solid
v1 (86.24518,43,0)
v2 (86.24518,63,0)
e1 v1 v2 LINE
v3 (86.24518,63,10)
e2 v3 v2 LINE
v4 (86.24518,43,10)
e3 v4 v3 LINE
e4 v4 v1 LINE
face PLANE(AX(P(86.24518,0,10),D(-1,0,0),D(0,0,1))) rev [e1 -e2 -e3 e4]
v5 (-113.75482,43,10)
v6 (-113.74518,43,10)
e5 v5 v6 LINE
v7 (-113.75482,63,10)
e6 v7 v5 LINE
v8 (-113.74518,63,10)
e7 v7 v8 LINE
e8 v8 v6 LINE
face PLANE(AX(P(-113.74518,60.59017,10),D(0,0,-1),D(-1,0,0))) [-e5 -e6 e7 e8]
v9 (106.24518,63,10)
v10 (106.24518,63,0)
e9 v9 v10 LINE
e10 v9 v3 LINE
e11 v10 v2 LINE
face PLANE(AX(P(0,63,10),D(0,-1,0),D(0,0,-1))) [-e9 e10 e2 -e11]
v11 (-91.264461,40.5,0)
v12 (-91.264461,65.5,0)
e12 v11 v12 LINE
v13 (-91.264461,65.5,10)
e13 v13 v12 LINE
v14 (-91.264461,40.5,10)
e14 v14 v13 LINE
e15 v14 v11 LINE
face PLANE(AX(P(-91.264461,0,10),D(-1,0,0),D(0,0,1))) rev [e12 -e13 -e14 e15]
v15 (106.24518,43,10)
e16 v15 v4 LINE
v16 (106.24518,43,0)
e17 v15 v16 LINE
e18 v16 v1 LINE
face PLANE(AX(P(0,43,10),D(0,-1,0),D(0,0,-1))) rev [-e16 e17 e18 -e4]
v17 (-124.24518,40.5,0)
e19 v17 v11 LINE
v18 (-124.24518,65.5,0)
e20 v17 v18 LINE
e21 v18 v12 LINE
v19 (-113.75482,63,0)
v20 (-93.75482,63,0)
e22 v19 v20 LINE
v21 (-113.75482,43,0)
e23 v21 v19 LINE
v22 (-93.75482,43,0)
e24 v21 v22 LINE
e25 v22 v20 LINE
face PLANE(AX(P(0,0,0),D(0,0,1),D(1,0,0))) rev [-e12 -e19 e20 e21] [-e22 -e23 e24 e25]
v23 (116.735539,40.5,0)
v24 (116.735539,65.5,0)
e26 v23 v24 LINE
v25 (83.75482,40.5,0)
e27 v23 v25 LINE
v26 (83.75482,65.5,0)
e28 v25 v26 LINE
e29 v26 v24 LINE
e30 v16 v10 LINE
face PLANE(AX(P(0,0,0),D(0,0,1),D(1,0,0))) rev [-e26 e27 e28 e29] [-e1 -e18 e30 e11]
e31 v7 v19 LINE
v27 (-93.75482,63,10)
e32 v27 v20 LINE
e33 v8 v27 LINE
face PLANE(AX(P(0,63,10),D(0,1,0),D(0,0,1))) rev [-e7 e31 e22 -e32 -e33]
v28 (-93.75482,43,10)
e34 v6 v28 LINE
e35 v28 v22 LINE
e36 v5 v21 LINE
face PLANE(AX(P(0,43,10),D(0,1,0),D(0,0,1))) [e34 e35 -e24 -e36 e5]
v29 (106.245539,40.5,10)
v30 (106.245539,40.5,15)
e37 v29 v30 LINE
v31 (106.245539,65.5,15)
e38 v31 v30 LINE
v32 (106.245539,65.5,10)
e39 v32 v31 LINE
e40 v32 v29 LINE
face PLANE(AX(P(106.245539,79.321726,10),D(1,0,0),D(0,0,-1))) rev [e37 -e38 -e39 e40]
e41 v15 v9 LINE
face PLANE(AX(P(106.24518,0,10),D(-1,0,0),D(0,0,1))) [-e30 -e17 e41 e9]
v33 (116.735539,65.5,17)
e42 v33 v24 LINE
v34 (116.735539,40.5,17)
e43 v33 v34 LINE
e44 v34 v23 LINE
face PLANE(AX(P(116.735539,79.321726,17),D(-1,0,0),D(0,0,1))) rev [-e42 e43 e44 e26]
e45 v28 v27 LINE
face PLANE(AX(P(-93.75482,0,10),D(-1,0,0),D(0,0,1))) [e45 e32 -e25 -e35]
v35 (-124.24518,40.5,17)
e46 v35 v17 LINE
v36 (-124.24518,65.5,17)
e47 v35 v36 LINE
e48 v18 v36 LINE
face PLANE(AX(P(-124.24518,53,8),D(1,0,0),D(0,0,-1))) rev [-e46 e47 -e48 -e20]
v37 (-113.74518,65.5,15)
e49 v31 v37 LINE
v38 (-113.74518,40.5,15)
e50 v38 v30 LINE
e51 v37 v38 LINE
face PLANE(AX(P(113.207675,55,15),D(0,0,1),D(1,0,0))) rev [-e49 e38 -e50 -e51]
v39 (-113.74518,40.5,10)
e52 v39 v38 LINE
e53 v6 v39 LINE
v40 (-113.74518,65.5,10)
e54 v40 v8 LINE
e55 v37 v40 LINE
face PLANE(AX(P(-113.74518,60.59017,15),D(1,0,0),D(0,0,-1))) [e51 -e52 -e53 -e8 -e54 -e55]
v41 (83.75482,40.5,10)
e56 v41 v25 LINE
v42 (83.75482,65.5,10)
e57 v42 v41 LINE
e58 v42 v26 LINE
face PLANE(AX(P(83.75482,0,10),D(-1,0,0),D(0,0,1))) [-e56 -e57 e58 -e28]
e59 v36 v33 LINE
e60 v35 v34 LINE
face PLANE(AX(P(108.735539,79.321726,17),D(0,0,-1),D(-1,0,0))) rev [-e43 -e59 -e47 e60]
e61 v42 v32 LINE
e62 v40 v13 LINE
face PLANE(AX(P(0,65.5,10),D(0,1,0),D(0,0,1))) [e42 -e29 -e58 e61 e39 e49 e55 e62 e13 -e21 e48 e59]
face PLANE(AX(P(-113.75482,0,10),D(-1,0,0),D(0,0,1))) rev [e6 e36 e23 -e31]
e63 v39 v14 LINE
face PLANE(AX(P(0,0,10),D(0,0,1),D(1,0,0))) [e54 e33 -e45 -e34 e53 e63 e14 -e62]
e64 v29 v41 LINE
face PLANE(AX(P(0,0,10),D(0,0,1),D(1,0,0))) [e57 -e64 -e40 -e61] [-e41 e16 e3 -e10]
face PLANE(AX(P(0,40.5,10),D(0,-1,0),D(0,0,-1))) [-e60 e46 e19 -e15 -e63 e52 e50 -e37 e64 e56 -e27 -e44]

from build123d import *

# Parameters (mm, degrees)
ESQUISSE1_W                     = 20
ESQUISSE1_H                     = 20
BOSS_EXTRU_1_DEPTH              = 10
ESQUISSE2_W                     = 237.218260139
ESQUISSE2_H                     = 128.428413156
ENL_V_MAT_EXTRU_6_DEPTH         = 10
ENL_V_MAT_EXTRU_7_DEPTH         = 10
BOSS_EXTRU_4_START              = -2
BOSS_EXTRU_4_DEPTH              = 9
ESQUISSE10_W                    = 2
ESQUISSE10_H                    = 4
BOSS_EXTRU_5_DEPTH              = 224.980719072
ESQUISSE11_W                    = 2.5
ESQUISSE11_H                    = 5
BOSS_EXTRU_6_DEPTH              = 4
SYM_TRIE1_START                 = 8
SYM_TRIE1_OUTLINE_W             = 4
SYM_TRIE1_OUTLINE_H             = 4
SYM_TRIE1_DEPTH                 = 9
BOSS_EXTRU_9_REACH              = 128.238
BOSS_EXTRU_9_DIRECTION_2_REACH  = 128.238
BOSS_EXTRU_10_REACH             = 128.238
BOSS_EXTRU_10_DIRECTION_2_REACH = 128.238
ESQUISSE14_W                    = 8
ESQUISSE14_H                    = 8
BOSS_EXTRU_11_DEPTH             = 25


# Read off the part's stored shape, not the designer's step: Symétrie1
with BuildPart() as part:
    # Esquisse1 → Boss.-Extru.1 (new body)
    with BuildSketch(Plane.XY):
        Polygon((-116.245179768, 65.5), (-116.245179768, 40.5), (-116.189357624, -40.5), (-116.189357624, -65.5), (108.67971716, -65.5), (108.67971716, -40.5), (108.735539304, 40.5), (108.735539304, 65.5), align=None)
        Polygon((83.754820232, 40.5), (106.172004788, 40.5), (106.172004788, -40.5), (83.67971716, -40.5), (83.67971716, -63), (-91.189357624, -63), (-91.189357624, -40.5), (-113.681645253, -40.5), (-113.681645253, 40.5), (-91.264460696, 40.5), (-91.264460696, 63), (83.754820232, 63), align=None, mode=Mode.SUBTRACT)
        Polygon((-113.66622051, -63.007706414), (-113.681645253, -43.007712371), (-93.681645253, -43.023131157), (-93.697069995, -62.992287629), align=None, mode=Mode.SUBTRACT)
        Polygon((106.172004788, -43.007712371), (106.156580046, -63.007706414), (86.187429531, -62.992287629), (86.172004788, -43.023131157), align=None, mode=Mode.SUBTRACT)
        with Locations((-103.754820232, 53)):
            Rectangle(ESQUISSE1_W, ESQUISSE1_H, mode=Mode.SUBTRACT)
        with Locations((96.245179768, 53)):
            Rectangle(ESQUISSE1_W, ESQUISSE1_H, mode=Mode.SUBTRACT)
    extrude(amount=BOSS_EXTRU_1_DEPTH)

    # Esquisse2 → Enlèv. mat.-Extru.6 (cut)
    with BuildSketch(Plane(origin=(0, 0, 0), x_dir=(-1, 0, 0), z_dir=(0, 0, -1))):
        with Locations((9.873590765, -23.714206578)):
            Rectangle(ESQUISSE2_W, ESQUISSE2_H)
    extrude(amount=-ENL_V_MAT_EXTRU_6_DEPTH, mode=Mode.SUBTRACT)

    # Esquisse4 → Enlèv. mat.-Extru.7 (cut)
    with BuildSketch(Plane(origin=(0, 0, 0), x_dir=(-1, 0, 0), z_dir=(0, 0, -1))):
        Polygon((-83.754820232, 63), (-83.754820232, 68.626436571), (91.264460696, 65.5), (91.264460696, 63), align=None)
    extrude(amount=-ENL_V_MAT_EXTRU_7_DEPTH, mode=Mode.SUBTRACT)


with BuildPart() as enl_v_mat_extru_7_piece_1:
    # of the separate pieces the step leaves, piece 1, a body of its own (enl_v_mat_extru_7_pieces)
    add(part.part.solids().sort_by_distance((-116.245179768, 65.5, 0))[0])

    # Esquisse9 → Boss.-Extru.4 (add)
    with BuildSketch(Plane.XY.offset(10).offset(BOSS_EXTRU_4_START)):
        Polygon((-116.245179768, 53), (-116.245179768, 55), (-120.245179768, 55), (-120.245179768, 51), (-116.245179768, 51), align=None)
    extrude(amount=BOSS_EXTRU_4_DEPTH)

    # Esquisse10 → Boss.-Extru.5 (add)
    with BuildSketch(Plane(origin=(-116.245179768, 0, 0), x_dir=(0, 0, -1), z_dir=(1, 0, 0))):
        with Locations((-16, 53)):
            Rectangle(ESQUISSE10_W, ESQUISSE10_H)
    extrude(amount=BOSS_EXTRU_5_DEPTH)

    # Esquisse11 → Boss.-Extru.6 (add)
    with BuildSketch(Plane.XZ.offset(-51)):
        with Locations((-114.995179768, 12.5)):
            Rectangle(ESQUISSE11_W, ESQUISSE11_H)
    extrude(amount=-BOSS_EXTRU_6_DEPTH)

    # Symétrie1 outline → Symétrie1 (add)
    with BuildSketch(Plane.XY.offset(SYM_TRIE1_START)):
        with Locations((-122.245179768, 53)):
            Rectangle(SYM_TRIE1_OUTLINE_W, SYM_TRIE1_OUTLINE_H)
    extrude(amount=SYM_TRIE1_DEPTH)


with BuildPart() as enl_v_mat_extru_7_piece_2:
    # of the separate pieces the step leaves, piece 2, a body of its own (enl_v_mat_extru_7_pieces)
    add(part.part.solids().sort_by_distance((108.735539304, 65.5, 0))[0])

    # Boss.-Extru.9: up to this face of the body (flat: up to its plane)
    boss_extru_9_end = Plane(enl_v_mat_extru_7_piece_2.part.faces().sort_by_distance((96.245179768, 65.5, 5))[0])
    # Esquisse12 → Boss.-Extru.9 (add, up to the picked face)
    with BuildSketch(Plane(origin=(0, 55, 0), x_dir=(1, 0, 0), z_dir=(0, 1, 0)), mode=Mode.PRIVATE) as boss_extru_9_sk1:
        Polygon((108.735539304, -10), (108.735539304, -8), (116.735539304, -8), (116.735539304, -17), (108.735539304, -17), (108.735539304, -15), (106.245539304, -15), (106.245539304, -10), align=None)
    boss_extru_9_tool1 = split(extrude(boss_extru_9_sk1.sketch, amount=BOSS_EXTRU_9_REACH, mode=Mode.PRIVATE), bisect_by=boss_extru_9_end, keep=Keep.BOTH, mode=Mode.PRIVATE)

    add(enl_v_mat_extru_7_piece_1.part)  # Boss.-Extru.9 merges Enlèv. mat.-Extru.7 piece 1
    add(boss_extru_9_tool1.solids().sort_by(Axis((111.962298, 55, 12.5), (0, 1, 0)))[0])

    # Boss.-Extru.9 direction 2: up to this face of the body (flat: up to its plane)
    boss_extru_9_direction_2_end = Plane(enl_v_mat_extru_7_piece_2.part.faces().sort_by_distance((96.245179768, 40.5, 5))[0])
    # Esquisse12 → Boss.-Extru.9 direction 2 (add, up to the picked face)
    with BuildSketch(Plane(origin=(0, 55, 0), x_dir=(1, 0, 0), z_dir=(0, 1, 0)), mode=Mode.PRIVATE) as boss_extru_9_direction_2_sk1:
        Polygon((108.735539304, -10), (108.735539304, -8), (116.735539304, -8), (116.735539304, -17), (108.735539304, -17), (108.735539304, -15), (106.245539304, -15), (106.245539304, -10), align=None)
    boss_extru_9_direction_2_tool1 = split(extrude(boss_extru_9_direction_2_sk1.sketch, amount=-BOSS_EXTRU_9_DIRECTION_2_REACH, mode=Mode.PRIVATE), bisect_by=boss_extru_9_direction_2_end, keep=Keep.BOTH, mode=Mode.PRIVATE)
    add(boss_extru_9_direction_2_tool1.solids().sort_by(Axis((111.962298, 55, 12.5), (0, -1, 0)))[0])

    # Boss.-Extru.10: up to this face of the body (flat: up to its plane)
    boss_extru_10_end = Plane(enl_v_mat_extru_7_piece_2.part.faces().sort_by_distance((100.216105898, 65.5, 6.894873222))[0])
    # Esquisse13 → Boss.-Extru.10 (add, up to the picked face)
    with BuildSketch(Plane(origin=(0, 55, 0), x_dir=(1, 0, 0), z_dir=(0, 1, 0)), mode=Mode.PRIVATE) as boss_extru_10_sk1:
        Polygon((-124.245179768, -17), (108.735539304, -17), (108.735539304, -15), (-113.745179768, -15), (-113.745179768, -10), (-116.245179768, -10), (-116.245179768, -8), (-124.245179768, -8), align=None)
    boss_extru_10_tool1 = split(extrude(boss_extru_10_sk1.sketch, amount=BOSS_EXTRU_10_REACH, mode=Mode.PRIVATE), bisect_by=boss_extru_10_end, keep=Keep.BOTH, mode=Mode.PRIVATE)
    add(boss_extru_10_tool1.solids().sort_by(Axis((-22.049518, 55, 15.446639), (0, 1, 0)))[0])

    # Boss.-Extru.10 direction 2: up to this face of the body (flat: up to its plane)
    boss_extru_10_direction_2_end = Plane(enl_v_mat_extru_7_piece_2.part.faces().sort_by_distance((-103.754820232, 40.5, 5))[0])
    # Esquisse13 → Boss.-Extru.10 direction 2 (add, up to the picked face)
    with BuildSketch(Plane(origin=(0, 55, 0), x_dir=(1, 0, 0), z_dir=(0, 1, 0)), mode=Mode.PRIVATE) as boss_extru_10_direction_2_sk1:
        Polygon((-124.245179768, -17), (108.735539304, -17), (108.735539304, -15), (-113.745179768, -15), (-113.745179768, -10), (-116.245179768, -10), (-116.245179768, -8), (-124.245179768, -8), align=None)
    boss_extru_10_direction_2_tool1 = split(extrude(boss_extru_10_direction_2_sk1.sketch, amount=-BOSS_EXTRU_10_DIRECTION_2_REACH, mode=Mode.PRIVATE), bisect_by=boss_extru_10_direction_2_end, keep=Keep.BOTH, mode=Mode.PRIVATE)
    add(boss_extru_10_direction_2_tool1.solids().sort_by(Axis((-22.049518, 55, 15.446639), (0, -1, 0)))[0])

    # Esquisse14 → Boss.-Extru.11 (add)
    with BuildSketch(Plane(origin=(0, 65.5, 0), x_dir=(1, 0, 0), z_dir=(0, 1, 0))):
        with Locations((112.735539304, -4)):
            Rectangle(ESQUISSE14_W, ESQUISSE14_H)
        with Locations((-120.245179768, -4)):
            Rectangle(ESQUISSE14_W, ESQUISSE14_H)
    extrude(amount=-BOSS_EXTRU_11_DEPTH)


solid = enl_v_mat_extru_7_piece_2.part
